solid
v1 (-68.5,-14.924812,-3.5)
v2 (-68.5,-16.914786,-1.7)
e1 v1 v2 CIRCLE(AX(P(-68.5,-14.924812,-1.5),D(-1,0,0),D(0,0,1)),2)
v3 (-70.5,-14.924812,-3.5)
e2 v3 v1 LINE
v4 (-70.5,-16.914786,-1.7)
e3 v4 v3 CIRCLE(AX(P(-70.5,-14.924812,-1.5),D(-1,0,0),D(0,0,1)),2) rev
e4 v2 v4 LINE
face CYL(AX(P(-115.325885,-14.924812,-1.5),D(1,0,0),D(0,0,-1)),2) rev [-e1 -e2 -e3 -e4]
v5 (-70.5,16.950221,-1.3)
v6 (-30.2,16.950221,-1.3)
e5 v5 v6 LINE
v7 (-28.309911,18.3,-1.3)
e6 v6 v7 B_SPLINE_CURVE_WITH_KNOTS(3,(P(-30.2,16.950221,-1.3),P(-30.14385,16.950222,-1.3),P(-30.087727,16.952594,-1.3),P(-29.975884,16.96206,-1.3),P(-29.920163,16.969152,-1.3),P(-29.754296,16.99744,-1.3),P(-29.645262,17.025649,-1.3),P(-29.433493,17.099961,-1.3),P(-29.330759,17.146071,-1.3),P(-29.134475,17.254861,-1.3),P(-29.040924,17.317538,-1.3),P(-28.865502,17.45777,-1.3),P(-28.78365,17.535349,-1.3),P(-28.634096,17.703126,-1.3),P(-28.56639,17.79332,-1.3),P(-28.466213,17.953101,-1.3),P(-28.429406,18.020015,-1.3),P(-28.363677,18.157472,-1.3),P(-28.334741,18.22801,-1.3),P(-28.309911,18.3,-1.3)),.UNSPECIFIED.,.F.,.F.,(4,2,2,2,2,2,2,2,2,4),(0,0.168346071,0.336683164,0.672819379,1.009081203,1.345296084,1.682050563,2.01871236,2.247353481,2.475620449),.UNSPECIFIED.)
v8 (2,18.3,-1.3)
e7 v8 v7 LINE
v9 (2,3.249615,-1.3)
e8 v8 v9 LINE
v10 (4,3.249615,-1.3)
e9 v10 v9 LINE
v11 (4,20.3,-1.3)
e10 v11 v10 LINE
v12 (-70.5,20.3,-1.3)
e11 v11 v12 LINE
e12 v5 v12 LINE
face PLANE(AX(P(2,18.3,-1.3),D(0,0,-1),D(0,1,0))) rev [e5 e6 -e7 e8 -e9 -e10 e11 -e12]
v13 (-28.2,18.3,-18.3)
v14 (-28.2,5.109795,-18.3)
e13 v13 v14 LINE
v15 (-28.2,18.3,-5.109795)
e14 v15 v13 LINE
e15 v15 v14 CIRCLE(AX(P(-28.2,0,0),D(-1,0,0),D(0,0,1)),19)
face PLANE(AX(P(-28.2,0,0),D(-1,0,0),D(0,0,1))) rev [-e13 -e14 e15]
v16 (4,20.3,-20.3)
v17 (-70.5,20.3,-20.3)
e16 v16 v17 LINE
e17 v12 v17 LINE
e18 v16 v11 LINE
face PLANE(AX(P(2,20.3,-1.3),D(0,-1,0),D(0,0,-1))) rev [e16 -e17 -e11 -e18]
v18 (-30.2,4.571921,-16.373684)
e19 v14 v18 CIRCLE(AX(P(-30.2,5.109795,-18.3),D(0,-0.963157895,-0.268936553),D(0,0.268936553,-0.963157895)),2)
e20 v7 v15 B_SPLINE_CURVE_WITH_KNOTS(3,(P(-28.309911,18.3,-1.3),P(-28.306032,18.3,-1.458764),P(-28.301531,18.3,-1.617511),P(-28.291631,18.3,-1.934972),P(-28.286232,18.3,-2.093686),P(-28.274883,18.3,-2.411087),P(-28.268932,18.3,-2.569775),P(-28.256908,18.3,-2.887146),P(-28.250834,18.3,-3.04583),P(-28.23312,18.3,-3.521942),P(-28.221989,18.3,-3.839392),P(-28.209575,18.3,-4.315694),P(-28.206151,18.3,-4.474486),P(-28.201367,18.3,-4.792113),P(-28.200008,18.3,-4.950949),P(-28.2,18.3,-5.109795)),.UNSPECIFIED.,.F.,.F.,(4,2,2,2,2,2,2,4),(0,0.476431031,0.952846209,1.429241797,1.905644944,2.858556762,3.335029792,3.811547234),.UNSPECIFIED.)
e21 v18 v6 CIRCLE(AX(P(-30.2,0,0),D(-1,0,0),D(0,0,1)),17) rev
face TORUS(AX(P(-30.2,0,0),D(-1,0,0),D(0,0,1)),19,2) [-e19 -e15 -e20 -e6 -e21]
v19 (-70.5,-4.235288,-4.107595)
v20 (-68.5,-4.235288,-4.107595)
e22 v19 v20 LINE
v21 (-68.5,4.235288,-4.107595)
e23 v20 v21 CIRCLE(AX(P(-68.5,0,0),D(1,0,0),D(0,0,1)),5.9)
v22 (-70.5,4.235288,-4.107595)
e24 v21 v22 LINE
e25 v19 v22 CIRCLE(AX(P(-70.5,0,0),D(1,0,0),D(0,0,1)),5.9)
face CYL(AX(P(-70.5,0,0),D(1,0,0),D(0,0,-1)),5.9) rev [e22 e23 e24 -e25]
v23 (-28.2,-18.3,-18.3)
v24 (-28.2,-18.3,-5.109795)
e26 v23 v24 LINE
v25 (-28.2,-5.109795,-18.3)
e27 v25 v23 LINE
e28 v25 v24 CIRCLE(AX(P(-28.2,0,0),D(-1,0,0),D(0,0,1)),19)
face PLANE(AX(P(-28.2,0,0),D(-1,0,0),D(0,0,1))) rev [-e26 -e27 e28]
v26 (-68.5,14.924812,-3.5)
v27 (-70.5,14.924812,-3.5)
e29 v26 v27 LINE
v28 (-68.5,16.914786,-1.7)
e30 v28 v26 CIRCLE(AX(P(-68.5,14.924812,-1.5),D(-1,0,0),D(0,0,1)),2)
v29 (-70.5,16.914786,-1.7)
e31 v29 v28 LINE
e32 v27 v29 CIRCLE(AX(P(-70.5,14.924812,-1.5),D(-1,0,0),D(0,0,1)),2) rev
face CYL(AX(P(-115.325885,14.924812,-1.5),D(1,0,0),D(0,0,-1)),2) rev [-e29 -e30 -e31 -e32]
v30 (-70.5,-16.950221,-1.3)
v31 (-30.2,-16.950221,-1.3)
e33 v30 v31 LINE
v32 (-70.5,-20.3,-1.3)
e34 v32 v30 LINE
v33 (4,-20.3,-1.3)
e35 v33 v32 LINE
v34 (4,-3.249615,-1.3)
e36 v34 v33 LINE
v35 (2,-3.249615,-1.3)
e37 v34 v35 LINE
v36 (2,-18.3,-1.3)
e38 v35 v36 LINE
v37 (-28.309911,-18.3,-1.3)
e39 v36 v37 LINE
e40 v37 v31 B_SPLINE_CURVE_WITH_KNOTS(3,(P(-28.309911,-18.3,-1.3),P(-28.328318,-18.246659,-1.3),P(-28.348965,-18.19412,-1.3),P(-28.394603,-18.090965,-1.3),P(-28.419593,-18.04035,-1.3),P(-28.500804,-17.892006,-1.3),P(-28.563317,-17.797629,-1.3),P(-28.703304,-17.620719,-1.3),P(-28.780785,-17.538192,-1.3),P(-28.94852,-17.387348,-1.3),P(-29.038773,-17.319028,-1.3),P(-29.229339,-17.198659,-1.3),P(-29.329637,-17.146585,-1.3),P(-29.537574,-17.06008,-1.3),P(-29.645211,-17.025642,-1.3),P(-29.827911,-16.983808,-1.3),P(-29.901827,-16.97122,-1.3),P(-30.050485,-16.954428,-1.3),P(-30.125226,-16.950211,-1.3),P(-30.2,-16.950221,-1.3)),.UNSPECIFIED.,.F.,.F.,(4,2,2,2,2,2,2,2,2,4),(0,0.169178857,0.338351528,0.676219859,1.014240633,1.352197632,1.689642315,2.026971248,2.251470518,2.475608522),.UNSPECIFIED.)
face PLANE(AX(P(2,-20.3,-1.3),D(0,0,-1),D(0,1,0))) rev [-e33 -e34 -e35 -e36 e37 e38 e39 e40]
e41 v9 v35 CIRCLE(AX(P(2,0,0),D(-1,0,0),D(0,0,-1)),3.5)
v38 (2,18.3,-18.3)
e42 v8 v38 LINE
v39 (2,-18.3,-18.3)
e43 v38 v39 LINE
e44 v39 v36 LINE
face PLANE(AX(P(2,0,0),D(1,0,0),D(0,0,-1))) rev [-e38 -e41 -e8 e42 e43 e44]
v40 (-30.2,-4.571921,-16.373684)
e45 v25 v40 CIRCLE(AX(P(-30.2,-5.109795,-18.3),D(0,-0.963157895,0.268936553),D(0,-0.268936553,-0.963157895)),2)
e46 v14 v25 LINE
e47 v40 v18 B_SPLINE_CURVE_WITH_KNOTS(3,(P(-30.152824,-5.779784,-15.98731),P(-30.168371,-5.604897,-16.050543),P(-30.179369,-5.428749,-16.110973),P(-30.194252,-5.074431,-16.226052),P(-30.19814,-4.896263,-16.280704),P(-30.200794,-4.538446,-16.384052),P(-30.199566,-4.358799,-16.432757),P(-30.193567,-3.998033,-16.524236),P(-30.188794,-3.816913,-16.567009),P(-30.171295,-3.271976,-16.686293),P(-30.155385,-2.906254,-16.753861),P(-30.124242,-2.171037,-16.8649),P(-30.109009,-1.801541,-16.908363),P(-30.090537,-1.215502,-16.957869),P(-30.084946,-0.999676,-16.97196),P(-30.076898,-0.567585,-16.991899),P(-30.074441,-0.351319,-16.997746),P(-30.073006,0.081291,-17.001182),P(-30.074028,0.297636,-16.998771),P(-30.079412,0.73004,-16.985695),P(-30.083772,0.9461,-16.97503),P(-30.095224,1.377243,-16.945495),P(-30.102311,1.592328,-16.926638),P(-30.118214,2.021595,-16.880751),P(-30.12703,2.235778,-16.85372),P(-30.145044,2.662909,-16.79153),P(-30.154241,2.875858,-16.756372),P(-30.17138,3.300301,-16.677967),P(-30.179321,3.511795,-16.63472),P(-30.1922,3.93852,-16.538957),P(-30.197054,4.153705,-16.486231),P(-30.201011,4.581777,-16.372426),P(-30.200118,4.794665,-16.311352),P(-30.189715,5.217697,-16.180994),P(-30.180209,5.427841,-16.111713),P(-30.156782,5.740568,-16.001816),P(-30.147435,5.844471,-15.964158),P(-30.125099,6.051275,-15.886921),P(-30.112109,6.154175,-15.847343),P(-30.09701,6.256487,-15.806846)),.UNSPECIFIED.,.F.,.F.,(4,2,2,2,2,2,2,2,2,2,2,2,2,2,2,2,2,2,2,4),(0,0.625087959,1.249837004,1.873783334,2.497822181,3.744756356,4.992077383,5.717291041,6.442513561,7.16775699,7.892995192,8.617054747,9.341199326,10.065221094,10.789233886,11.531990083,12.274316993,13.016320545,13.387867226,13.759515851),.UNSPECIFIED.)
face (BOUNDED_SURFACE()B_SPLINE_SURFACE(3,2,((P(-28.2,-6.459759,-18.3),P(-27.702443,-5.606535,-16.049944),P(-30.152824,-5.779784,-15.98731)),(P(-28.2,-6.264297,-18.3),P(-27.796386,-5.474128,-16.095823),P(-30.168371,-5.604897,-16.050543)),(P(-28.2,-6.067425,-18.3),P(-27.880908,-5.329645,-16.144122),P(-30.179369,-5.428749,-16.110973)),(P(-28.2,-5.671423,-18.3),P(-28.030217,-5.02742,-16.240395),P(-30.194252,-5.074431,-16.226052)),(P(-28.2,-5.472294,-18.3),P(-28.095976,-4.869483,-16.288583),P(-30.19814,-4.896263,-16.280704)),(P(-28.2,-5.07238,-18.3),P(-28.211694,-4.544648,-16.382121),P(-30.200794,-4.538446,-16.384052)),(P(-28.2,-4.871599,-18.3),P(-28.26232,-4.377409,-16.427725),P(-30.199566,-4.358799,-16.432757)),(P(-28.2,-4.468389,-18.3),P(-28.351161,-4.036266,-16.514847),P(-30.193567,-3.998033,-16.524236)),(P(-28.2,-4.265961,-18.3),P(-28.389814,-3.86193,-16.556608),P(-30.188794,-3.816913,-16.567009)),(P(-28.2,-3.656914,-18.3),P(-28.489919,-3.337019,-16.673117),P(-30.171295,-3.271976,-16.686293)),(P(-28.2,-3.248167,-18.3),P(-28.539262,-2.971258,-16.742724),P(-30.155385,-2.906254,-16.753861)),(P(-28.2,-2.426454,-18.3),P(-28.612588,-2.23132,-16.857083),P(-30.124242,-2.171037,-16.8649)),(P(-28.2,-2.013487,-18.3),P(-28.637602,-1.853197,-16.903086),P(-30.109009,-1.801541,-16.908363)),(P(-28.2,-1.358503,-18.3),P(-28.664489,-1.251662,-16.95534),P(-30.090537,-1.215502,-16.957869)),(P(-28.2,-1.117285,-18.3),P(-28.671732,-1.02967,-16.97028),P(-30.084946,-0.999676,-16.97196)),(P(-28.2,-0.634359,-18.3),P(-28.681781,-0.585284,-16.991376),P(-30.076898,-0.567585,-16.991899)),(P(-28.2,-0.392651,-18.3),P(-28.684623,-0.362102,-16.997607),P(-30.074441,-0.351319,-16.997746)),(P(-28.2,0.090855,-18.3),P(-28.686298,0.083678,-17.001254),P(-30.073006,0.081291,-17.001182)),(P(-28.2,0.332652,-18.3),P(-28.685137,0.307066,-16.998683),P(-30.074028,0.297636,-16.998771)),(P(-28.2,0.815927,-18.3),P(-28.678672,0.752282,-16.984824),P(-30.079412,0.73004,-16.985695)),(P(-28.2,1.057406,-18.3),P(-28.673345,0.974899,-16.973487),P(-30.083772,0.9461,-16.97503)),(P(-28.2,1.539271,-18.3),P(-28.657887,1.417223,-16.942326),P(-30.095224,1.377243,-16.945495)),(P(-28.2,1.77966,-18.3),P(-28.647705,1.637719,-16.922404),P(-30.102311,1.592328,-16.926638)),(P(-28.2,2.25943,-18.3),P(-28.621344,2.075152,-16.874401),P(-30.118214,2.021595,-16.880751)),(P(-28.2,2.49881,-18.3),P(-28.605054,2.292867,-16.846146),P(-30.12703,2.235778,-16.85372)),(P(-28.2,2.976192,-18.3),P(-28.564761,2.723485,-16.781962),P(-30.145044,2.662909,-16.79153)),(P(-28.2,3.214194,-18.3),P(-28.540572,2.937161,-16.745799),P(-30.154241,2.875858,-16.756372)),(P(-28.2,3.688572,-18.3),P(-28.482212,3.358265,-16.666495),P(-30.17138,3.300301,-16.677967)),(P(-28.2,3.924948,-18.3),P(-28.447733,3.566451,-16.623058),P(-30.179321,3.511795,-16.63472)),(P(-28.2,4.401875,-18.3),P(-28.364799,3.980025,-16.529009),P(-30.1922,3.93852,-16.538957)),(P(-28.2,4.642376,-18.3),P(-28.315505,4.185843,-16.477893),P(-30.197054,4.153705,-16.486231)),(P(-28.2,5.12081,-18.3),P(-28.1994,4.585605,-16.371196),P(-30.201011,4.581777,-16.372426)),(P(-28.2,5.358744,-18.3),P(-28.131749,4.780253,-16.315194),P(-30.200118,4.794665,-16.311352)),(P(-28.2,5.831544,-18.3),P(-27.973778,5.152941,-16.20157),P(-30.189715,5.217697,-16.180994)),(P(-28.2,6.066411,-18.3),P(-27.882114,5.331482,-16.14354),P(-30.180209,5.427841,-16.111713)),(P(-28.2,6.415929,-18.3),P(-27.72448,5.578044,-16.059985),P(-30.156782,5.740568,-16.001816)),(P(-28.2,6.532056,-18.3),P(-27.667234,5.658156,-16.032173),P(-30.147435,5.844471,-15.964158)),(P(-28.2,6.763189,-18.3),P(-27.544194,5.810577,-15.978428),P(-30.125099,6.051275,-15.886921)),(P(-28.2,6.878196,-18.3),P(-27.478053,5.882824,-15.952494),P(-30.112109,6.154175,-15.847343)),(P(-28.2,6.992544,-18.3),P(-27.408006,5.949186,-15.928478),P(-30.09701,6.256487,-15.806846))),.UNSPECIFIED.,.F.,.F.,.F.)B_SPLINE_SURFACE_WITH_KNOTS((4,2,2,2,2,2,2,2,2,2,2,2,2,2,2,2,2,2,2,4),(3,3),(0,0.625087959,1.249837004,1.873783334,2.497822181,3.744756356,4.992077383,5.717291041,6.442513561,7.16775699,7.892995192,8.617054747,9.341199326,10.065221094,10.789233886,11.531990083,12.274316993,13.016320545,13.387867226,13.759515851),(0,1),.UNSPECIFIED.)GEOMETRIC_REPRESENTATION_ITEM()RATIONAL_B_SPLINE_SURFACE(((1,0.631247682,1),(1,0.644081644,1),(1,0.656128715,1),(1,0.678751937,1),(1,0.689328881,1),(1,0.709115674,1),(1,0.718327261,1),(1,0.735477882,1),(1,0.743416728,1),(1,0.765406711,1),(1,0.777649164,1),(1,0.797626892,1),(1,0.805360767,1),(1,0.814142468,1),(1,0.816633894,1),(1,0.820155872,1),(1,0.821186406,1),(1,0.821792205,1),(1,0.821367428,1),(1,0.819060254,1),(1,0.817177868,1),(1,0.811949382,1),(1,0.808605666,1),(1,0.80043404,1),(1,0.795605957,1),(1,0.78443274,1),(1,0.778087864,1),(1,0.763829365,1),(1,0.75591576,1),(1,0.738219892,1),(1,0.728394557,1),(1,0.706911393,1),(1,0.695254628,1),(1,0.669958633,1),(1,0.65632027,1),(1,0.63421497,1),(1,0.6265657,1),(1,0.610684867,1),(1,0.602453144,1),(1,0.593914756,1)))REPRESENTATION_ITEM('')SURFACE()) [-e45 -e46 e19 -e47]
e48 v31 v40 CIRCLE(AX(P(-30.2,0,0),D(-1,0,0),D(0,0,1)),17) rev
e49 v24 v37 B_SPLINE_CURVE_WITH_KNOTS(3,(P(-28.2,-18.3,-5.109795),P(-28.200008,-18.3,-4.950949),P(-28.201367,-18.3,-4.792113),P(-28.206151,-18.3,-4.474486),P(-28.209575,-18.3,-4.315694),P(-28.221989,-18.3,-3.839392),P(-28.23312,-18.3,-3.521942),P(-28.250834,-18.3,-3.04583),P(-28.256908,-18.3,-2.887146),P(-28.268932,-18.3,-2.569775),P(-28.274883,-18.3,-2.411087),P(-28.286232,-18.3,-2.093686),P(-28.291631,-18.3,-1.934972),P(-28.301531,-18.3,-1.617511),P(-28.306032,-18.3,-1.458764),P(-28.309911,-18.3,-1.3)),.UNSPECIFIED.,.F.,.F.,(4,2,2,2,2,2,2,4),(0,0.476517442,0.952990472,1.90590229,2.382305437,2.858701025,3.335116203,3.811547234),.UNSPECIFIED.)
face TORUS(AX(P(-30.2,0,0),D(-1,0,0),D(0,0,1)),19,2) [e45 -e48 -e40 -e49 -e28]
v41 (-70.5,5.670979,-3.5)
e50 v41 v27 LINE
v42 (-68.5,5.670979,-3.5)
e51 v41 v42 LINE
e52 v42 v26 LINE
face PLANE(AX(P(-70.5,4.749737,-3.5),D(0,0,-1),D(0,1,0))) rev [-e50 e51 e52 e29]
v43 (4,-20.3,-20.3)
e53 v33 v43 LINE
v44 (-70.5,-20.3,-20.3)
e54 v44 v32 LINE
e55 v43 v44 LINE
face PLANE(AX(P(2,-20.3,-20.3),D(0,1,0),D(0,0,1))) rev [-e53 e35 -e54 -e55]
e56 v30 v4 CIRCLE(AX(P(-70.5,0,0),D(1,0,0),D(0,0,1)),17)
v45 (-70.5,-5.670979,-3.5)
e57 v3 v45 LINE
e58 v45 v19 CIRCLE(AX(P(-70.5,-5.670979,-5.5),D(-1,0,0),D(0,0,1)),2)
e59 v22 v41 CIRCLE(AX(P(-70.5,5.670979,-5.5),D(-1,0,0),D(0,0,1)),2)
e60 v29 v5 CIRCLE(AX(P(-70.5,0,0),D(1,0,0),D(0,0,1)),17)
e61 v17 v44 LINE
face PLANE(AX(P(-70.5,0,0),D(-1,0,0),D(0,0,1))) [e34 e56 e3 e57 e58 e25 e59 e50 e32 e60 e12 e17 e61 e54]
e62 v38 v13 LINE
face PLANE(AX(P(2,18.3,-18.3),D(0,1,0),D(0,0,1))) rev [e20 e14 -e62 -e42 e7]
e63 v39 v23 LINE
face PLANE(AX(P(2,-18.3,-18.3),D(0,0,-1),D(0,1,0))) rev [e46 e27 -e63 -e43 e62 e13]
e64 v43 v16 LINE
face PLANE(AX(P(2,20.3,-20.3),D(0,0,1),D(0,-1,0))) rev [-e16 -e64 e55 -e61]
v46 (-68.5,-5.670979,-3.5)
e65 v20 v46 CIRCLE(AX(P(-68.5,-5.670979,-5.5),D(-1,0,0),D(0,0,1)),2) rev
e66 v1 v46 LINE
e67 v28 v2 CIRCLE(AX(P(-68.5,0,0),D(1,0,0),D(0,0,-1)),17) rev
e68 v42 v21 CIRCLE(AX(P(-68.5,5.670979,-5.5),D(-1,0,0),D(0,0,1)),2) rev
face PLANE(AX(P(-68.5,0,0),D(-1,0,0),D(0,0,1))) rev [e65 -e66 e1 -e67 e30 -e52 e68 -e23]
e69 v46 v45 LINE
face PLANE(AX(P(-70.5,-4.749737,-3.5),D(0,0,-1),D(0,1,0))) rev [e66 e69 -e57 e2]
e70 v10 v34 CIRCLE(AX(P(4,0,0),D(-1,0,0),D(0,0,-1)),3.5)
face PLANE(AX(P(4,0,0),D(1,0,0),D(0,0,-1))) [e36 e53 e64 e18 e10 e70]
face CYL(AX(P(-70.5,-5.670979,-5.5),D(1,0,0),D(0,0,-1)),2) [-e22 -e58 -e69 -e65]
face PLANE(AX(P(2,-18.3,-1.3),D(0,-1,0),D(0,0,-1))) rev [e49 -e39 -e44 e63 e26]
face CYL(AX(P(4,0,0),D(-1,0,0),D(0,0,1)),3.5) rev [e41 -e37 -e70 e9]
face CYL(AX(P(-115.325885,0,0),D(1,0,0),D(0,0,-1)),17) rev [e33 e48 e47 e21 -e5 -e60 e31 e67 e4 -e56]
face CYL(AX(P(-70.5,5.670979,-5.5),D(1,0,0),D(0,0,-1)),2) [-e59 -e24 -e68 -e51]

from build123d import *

# Parameters (mm, degrees)
BOSS_EXTRUDE1_DEPTH      = 2
BOSS_EXTRUDE1_DEPTH_BACK = 28.2
BOSS_EXTRUDE2_DEPTH      = 40.3
BOSS_EXTRUDE3_DEPTH      = 2
BOSS_EXTRUDE4_DEPTH      = 2
FILLET1_R                = 2
FILLET2_R                = 2


with BuildPart() as part:
    # Sketch1 → Boss-Extrude1 (new, two sides: drawn at the far end of the back side and taken through both)
    with BuildSketch(Plane.YZ.offset(-BOSS_EXTRUDE1_DEPTH_BACK)):
        Polygon((-18.3, -1.3), (-18.3, -18.3), (18.3, -18.3), (18.3, -1.3), (20.3, -1.3), (20.3, -20.3), (-20.3, -20.3), (-20.3, -1.3), align=None)
    extrude(amount=BOSS_EXTRUDE1_DEPTH + BOSS_EXTRUDE1_DEPTH_BACK)

    # Sketch2 → Boss-Extrude2 (add)
    with BuildSketch(Plane(origin=(-28.2, 0, 0), x_dir=(0, -1, 0), z_dir=(-1, 0, 0))):
        with BuildLine():
            Line((-18.3, -1.3), (-16.950221237, -1.3))
            ThreePointArc((-16.950221237, -1.3), (0, -17), (16.950221237, -1.3))
            Line((16.950221237, -1.3), (18.3, -1.3))
            Line((18.3, -1.3), (20.3, -1.3))
            Line((20.3, -1.3), (20.3, -20.3))
            Line((20.3, -20.3), (-20.3, -20.3))
            Line((-20.3, -20.3), (-20.3, -1.3))
            Line((-20.3, -1.3), (-18.3, -1.3))
        make_face()
    extrude(amount=BOSS_EXTRUDE2_DEPTH)

    # Sketch3 → Boss-Extrude3 (add)
    with BuildSketch(Plane.YZ.offset(2)):
        with BuildLine():
            Line((3.249615362, -1.3), (20.3, -1.3))
            Line((20.3, -1.3), (20.3, -20.3))
            Line((20.3, -20.3), (-20.3, -20.3))
            Line((-20.3, -20.3), (-20.3, -1.3))
            Line((-20.3, -1.3), (-3.249615362, -1.3))
            ThreePointArc((-3.249615362, -1.3), (0, -3.5), (3.249615362, -1.3))
        make_face()
    extrude(amount=BOSS_EXTRUDE3_DEPTH)

    # Sketch4 → Boss-Extrude4 (add)
    with BuildSketch(Plane(origin=(-68.5, 0, 0), x_dir=(0, -1, 0), z_dir=(-1, 0, 0))):
        with BuildLine():
            Line((-20.3, -1.3), (-20.3, -20.3))
            Line((-20.3, -20.3), (20.3, -20.3))
            Line((20.3, -20.3), (20.3, -1.3))
            Line((20.3, -1.3), (16.950221237, -1.3))
            ThreePointArc((16.950221237, -1.3), (16.829001324, -2.405143328), (16.63580476, -3.5))
            Line((16.63580476, -3.5), (4.749736835, -3.5))
            ThreePointArc((4.749736835, -3.5), (0, -5.9), (-4.749736835, -3.5))
            Line((-4.749736835, -3.5), (-16.63580476, -3.5))
            ThreePointArc((-16.63580476, -3.5), (-16.829001324, -2.405143328), (-16.950221237, -1.3))
            Line((-16.950221237, -1.3), (-20.3, -1.3))
        make_face()
    extrude(amount=BOSS_EXTRUDE4_DEPTH)

    # Fillet1
    fillet1_edges = [part.edges().sort_by_distance(p)[0] for p in [
        (-28.2, 0, -17),
    ]]
    fillet(fillet1_edges, radius=FILLET1_R)

    # Fillet2
    # the kernel refuses this fillet: 2 mm, written as the material it adds along each edge
    with BuildSketch(Plane(origin=(-68.5, -16.63580476, -3.5), x_dir=(0, -0.15316112796135575, 0.9882012289415578), z_dir=(-1, 0, 0))) as fillet2_piece_1:
        with BuildLine():
            CenterArc((1.714344809, 1.997127842), FILLET2_R, 188.810163249, 84.260829523)
            Line((-0.262057649, 1.690805586), (0, 0))
            ThreePointArc((0, 0), (0.91074568, -0.024413344), (1.82149136, 0))
        make_face()
    extrude(amount=2)
    with BuildSketch(Plane(origin=(-68.5, 16.63580476, -3.5), x_dir=(0, 0.15316112796135792, 0.9882012289415576), z_dir=(-1, 0, 0))) as fillet2_piece_2:
        with BuildLine():
            CenterArc((1.714344809, -1.997127842), FILLET2_R, 86.929007228, 84.260829523)
            Line((-0.262057649, -1.690805586), (0, 0))
            ThreePointArc((0, 0), (0.91074568, 0.024413344), (1.82149136, 0))
        make_face()
    extrude(amount=2)
    # the kernel refuses this fillet: 2 mm, written as the material it takes off along each edge
    with BuildSketch(Plane(origin=(-66.196895208, -4.749736835, -3.5), x_dir=(0, 0.6461838477214604, -0.7631817836819014), z_dir=(-1, 0, 0))) as fillet2_2_piece_1:
        with BuildLine():
            CenterArc((0.931071921, 1.995442745), FILLET2_R, 220.254494439, 45.876878938)
            Line((-0.595291646, 0.703075049), (0, 0))
            ThreePointArc((0, 0), (0.398066981, 0.013443903), (0.796133961, 0))
        make_face()
    extrude(amount=6.606209583, mode=Mode.SUBTRACT)
    with BuildSketch(Plane(origin=(-66.196895208, 4.749736835, -3.5), x_dir=(0, 1, 0), z_dir=(-1, 0, 0))) as fillet2_2_piece_2:
        with BuildLine():
            CenterArc((0.921241917, 2), FILLET2_R, 224.123121062, 45.876878938)
            ThreePointArc((-0.514448906, 0.607594937), (-0.246964311, 0.312484702), (0, 0))
            Line((0, 0), (0.921241917, 0))
        make_face()
    extrude(amount=6.606209583, mode=Mode.SUBTRACT)


solid = part.part
